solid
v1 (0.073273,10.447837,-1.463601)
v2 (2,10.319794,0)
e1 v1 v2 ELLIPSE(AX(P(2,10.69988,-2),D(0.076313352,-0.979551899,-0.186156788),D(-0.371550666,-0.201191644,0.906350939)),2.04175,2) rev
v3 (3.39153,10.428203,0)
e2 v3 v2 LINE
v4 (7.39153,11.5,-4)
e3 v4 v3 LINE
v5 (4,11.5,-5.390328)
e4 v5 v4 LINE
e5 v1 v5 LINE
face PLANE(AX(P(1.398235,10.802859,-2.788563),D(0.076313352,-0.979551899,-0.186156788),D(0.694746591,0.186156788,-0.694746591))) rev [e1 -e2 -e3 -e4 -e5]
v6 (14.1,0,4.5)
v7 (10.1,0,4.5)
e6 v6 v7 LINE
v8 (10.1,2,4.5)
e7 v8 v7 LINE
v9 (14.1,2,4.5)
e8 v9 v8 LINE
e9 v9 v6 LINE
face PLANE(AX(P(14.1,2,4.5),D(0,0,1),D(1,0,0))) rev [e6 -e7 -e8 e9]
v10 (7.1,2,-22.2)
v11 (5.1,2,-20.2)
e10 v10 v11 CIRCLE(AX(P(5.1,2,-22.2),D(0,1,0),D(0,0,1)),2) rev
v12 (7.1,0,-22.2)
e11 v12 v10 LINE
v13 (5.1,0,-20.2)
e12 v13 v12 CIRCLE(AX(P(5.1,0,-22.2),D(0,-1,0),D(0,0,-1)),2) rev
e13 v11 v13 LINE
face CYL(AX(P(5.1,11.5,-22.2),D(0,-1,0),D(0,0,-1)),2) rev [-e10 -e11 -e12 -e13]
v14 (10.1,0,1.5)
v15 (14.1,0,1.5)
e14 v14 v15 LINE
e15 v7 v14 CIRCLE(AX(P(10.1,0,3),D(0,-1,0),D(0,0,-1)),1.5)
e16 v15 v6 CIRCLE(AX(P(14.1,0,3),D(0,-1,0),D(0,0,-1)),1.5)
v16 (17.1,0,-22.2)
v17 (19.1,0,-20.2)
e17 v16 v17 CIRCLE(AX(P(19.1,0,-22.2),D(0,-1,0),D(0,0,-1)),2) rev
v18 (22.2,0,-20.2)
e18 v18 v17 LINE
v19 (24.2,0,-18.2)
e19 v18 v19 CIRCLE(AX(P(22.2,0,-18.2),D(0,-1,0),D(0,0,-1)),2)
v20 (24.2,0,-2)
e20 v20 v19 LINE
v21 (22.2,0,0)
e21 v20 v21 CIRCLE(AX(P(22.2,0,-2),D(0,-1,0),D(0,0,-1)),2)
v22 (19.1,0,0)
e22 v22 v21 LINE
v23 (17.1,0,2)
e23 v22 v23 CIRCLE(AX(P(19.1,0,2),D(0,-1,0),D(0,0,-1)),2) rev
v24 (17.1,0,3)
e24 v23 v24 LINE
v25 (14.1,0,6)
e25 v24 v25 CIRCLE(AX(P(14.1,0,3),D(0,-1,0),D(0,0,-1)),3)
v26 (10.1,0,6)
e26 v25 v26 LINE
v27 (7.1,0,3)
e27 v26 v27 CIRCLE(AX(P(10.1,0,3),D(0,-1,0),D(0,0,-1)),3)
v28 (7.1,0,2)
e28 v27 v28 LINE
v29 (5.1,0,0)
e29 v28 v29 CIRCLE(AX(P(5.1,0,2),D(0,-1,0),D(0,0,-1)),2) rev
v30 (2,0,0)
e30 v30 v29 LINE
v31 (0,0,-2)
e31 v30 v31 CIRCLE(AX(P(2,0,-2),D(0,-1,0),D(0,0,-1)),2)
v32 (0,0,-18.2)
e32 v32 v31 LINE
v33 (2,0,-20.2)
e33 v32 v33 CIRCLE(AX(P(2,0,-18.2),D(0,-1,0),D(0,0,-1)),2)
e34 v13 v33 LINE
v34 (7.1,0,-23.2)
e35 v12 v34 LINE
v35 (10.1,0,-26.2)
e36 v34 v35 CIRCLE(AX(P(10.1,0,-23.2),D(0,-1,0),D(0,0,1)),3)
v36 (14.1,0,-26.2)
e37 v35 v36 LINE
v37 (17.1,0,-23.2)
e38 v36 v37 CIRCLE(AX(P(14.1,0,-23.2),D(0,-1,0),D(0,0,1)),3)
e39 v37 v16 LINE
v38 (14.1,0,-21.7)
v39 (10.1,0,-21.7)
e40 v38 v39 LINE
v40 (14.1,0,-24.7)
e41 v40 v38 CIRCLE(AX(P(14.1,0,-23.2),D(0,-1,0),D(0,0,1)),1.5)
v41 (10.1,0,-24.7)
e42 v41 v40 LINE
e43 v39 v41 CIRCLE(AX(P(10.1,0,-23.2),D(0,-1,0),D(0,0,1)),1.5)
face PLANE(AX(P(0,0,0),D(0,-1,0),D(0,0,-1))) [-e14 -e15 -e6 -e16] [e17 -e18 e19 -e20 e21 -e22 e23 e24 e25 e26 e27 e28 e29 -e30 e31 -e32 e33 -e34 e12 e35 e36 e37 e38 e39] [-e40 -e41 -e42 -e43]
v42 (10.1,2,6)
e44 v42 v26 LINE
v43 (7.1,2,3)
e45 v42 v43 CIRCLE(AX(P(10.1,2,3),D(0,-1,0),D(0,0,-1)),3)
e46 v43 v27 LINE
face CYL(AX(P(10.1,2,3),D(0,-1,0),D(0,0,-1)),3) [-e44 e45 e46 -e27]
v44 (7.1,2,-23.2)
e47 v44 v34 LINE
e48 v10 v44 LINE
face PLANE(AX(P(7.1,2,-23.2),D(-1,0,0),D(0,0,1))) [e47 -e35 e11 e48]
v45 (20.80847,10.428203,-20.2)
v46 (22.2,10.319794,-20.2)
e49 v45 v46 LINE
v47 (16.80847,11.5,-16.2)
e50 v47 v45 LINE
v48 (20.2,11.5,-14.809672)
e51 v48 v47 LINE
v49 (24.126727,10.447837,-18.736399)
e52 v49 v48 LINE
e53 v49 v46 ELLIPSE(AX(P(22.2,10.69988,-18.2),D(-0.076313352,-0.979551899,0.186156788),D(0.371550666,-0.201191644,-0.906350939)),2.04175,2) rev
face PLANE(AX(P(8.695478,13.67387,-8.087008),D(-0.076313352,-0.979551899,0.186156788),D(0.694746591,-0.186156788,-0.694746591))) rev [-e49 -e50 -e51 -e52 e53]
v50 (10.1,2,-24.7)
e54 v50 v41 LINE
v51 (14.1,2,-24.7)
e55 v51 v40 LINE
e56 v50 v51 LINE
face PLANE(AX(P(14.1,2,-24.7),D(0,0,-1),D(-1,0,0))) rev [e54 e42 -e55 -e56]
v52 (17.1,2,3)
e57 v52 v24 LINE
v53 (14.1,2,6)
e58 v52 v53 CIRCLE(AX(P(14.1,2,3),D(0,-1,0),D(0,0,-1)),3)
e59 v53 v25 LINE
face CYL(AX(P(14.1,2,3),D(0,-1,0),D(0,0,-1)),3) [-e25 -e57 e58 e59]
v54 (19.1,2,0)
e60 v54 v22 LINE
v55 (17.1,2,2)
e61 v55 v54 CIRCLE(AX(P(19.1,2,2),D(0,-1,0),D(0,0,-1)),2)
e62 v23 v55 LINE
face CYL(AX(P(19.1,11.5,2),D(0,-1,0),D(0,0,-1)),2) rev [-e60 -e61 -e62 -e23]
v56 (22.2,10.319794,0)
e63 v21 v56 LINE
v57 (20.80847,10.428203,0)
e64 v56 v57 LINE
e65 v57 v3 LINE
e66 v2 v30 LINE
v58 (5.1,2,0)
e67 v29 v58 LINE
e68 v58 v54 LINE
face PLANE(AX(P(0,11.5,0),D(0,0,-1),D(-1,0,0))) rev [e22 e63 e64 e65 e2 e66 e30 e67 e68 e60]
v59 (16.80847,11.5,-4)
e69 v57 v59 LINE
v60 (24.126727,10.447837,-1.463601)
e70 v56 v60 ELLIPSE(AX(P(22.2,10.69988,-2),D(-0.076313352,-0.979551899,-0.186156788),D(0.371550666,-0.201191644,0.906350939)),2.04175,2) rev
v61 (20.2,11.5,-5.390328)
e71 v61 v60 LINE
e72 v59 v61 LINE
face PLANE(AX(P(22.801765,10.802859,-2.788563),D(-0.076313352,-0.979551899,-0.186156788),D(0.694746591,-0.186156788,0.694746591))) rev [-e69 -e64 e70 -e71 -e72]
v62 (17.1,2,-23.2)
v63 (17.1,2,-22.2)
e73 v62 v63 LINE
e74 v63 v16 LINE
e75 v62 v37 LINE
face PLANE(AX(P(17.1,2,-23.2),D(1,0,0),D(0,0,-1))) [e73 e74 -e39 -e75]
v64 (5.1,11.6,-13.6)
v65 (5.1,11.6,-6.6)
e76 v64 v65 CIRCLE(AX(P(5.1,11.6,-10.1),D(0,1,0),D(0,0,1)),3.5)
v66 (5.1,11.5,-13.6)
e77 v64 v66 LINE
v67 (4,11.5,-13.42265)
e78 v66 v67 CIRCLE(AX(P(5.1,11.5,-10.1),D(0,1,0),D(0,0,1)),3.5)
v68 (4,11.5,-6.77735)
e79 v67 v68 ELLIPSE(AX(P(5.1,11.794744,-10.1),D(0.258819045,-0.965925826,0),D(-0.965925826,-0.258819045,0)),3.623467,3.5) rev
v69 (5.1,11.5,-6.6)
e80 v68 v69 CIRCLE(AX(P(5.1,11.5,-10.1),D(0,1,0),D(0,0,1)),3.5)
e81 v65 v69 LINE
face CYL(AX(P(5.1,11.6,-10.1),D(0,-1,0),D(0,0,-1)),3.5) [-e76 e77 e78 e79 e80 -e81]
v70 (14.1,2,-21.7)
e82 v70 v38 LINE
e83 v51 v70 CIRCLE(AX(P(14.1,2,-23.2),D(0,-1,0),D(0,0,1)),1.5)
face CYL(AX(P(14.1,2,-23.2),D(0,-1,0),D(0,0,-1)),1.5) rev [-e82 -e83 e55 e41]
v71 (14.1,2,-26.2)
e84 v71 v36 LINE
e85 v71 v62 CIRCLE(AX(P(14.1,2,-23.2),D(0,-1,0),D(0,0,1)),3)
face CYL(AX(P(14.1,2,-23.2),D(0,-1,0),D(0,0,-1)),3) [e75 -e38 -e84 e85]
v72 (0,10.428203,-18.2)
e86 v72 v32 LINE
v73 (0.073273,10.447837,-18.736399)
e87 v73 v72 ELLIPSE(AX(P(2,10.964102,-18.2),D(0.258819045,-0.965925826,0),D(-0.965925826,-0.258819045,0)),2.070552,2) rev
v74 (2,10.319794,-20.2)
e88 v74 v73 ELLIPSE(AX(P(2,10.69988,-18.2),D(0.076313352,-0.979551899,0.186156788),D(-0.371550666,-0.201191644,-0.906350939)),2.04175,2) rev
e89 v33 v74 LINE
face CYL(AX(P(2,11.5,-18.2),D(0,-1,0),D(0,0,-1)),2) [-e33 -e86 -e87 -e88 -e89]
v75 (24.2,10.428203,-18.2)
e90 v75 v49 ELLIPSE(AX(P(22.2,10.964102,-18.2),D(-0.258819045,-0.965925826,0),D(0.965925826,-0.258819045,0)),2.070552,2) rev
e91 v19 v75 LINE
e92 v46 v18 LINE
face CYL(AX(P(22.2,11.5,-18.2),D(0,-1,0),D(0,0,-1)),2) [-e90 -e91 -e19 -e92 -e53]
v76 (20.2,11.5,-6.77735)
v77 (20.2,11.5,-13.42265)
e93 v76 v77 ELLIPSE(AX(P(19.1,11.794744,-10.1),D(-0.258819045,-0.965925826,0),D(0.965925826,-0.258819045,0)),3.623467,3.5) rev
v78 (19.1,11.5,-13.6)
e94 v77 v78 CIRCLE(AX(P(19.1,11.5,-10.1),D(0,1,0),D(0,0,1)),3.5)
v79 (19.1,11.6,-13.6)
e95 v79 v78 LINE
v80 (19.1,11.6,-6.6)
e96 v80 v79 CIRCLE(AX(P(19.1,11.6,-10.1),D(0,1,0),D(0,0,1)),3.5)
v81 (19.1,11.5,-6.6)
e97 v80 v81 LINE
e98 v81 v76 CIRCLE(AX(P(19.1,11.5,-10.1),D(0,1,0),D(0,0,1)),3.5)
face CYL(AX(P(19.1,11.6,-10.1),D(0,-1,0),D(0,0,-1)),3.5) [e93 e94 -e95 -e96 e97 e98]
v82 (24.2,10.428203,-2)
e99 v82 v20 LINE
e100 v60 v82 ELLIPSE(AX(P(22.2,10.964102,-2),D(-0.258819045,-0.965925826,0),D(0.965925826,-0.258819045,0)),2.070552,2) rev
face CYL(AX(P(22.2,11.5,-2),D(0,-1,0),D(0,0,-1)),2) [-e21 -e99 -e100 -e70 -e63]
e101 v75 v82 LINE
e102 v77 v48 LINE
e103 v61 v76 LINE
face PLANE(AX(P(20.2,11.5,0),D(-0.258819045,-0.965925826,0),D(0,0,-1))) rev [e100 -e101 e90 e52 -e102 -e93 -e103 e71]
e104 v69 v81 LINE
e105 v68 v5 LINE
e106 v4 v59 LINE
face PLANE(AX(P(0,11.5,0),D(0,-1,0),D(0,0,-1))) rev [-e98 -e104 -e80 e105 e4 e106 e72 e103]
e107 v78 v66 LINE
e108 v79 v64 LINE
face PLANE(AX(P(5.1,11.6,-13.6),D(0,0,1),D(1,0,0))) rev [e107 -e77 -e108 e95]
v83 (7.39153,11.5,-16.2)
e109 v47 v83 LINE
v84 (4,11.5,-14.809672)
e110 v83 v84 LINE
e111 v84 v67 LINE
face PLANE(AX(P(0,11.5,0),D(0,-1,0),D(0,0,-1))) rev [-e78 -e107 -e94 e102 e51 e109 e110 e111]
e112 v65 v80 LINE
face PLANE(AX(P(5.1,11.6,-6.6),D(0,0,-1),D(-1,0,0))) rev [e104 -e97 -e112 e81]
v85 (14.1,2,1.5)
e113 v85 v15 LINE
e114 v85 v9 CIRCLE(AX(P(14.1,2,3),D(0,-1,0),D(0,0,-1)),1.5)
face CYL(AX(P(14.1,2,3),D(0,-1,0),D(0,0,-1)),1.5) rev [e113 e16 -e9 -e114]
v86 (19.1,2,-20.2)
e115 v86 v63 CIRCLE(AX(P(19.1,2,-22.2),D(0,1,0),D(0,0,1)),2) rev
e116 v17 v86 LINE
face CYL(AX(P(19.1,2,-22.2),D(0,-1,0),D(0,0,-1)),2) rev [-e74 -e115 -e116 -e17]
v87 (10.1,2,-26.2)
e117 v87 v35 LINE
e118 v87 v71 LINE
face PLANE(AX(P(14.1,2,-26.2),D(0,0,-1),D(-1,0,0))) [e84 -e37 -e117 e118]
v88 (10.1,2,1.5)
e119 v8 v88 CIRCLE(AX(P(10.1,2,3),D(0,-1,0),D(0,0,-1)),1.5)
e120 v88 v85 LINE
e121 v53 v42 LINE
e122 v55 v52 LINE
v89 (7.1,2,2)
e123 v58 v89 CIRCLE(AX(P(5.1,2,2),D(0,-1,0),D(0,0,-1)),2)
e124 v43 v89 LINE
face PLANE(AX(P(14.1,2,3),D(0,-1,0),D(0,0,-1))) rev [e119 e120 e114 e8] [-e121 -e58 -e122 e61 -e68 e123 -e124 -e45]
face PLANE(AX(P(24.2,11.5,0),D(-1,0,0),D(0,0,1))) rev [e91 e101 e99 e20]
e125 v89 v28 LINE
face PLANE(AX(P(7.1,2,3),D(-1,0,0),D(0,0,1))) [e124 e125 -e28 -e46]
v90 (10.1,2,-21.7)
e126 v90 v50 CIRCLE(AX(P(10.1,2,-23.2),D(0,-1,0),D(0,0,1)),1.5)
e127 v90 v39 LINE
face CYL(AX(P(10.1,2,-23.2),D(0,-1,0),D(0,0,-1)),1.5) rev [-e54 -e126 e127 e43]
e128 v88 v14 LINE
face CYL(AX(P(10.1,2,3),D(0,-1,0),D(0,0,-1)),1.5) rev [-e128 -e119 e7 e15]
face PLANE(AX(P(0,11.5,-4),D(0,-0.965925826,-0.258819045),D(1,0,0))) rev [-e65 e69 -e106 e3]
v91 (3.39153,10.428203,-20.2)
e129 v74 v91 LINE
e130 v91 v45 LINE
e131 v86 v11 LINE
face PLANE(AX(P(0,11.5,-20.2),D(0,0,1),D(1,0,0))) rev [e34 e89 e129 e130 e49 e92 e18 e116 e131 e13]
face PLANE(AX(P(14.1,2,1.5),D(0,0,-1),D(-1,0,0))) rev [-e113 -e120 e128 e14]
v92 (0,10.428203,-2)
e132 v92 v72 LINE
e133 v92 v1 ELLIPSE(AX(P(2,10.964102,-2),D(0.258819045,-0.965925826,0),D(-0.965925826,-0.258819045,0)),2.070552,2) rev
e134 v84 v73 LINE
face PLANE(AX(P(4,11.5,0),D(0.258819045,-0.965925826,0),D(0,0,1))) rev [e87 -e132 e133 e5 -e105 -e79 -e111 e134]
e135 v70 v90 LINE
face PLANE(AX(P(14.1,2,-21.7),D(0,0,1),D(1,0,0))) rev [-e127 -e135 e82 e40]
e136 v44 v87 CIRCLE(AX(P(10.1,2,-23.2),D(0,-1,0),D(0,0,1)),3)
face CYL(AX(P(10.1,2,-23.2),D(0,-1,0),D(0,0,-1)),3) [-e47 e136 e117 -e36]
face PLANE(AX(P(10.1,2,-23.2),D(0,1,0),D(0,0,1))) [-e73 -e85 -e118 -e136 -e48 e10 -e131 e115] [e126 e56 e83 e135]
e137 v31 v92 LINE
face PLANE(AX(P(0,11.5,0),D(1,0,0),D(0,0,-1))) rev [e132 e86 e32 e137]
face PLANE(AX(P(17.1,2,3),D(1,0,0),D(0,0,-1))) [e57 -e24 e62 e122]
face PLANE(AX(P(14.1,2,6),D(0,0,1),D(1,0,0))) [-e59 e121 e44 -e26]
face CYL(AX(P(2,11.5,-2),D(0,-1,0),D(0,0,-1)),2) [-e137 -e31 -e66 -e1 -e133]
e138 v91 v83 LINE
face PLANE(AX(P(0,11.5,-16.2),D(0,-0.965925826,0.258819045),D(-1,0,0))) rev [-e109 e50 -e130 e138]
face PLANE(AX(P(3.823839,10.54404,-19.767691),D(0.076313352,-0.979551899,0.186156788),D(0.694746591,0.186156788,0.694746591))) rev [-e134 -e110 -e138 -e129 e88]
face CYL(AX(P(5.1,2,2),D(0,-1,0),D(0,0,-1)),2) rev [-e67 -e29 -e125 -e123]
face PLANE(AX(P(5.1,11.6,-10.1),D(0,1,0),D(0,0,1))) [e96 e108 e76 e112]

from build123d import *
from OCP.BRepFilletAPI import BRepFilletAPI_MakeChamfer

# Parameters (mm, degrees)
SKETCH_1_W       = 24.2
SKETCH_1_H       = 20.2
EXTRUDE_1_DEPTH  = 11.5
EXTRUDE_2_DEPTH  = 2
FILLET_1_R       = 2
EXTRUDE_3_DEPTH  = 0.1
CHAMFER_1_SIZE   = 4
CHAMFER_1_SIZE_2 = 1.07179677
CHAMFER_3_SIZE   = 1
CHAMFER_3_SIZE2  = 2.43937374
FILLET_2_R       = 2


with BuildPart() as part:
    # 草图1 → 凸台-拉伸1 (new body)
    with BuildSketch(Plane(origin=(0, 0, 0), x_dir=(1, 0, 0), z_dir=(0, 1, 0))):
        with Locations((12.1, 10.1)):
            Rectangle(SKETCH_1_W, SKETCH_1_H)
    extrude(amount=EXTRUDE_1_DEPTH)

    # 草图2 → 凸台-拉伸2 (add)
    # profile 1 of 2: a face of its own
    with BuildSketch(Plane.XZ):
        with BuildLine():
            Line((17.1, 0), (7.1, 0))
            Line((7.1, 0), (7.1, 3))
            ThreePointArc((7.1, 3), (7.978679656, 5.121320344), (10.1, 6))
            Line((10.1, 6), (14.1, 6))
            ThreePointArc((14.1, 6), (16.221320344, 5.121320344), (17.1, 3))
            Line((17.1, 3), (17.1, 0))
        make_face()
        with BuildLine():
            Line((14.1, 1.5), (10.1, 1.5))
            ThreePointArc((10.1, 1.5), (8.6, 3), (10.1, 4.5))
            Line((10.1, 4.5), (14.1, 4.5))
            ThreePointArc((14.1, 4.5), (15.6, 3), (14.1, 1.5))
        make_face(mode=Mode.SUBTRACT)
    # profile 2 of 2: a face of its own
    with BuildSketch(Plane.XZ):
        with BuildLine():
            Line((7.1, -23.2), (7.1, -20.2))
            Line((7.1, -20.2), (17.1, -20.2))
            Line((17.1, -20.2), (17.1, -23.2))
            ThreePointArc((17.1, -23.2), (16.221320344, -25.321320344), (14.1, -26.2))
            Line((14.1, -26.2), (10.1, -26.2))
            ThreePointArc((10.1, -26.2), (7.978679656, -25.321320344), (7.1, -23.2))
        make_face()
        with BuildLine():
            Line((14.1, -21.7), (10.1, -21.7))
            ThreePointArc((10.1, -21.7), (8.6, -23.2), (10.1, -24.7))
            Line((10.1, -24.7), (14.1, -24.7))
            ThreePointArc((14.1, -24.7), (15.6, -23.2), (14.1, -21.7))
        make_face(mode=Mode.SUBTRACT)
    extrude(amount=-EXTRUDE_2_DEPTH)

    # 圆角1
    fillet_1_edges = [part.edges().sort_by_distance(p)[0] for p in [
        (7.1, 1, -20.2),
        (17.1, 1, -20.2),
        (17.1, 1, 0),
        (7.1, 1, 0),
    ]]
    fillet(fillet_1_edges, radius=FILLET_1_R)

    # 草图3 → 凸台-拉伸3 (add)
    with BuildSketch(Plane(origin=(0, 11.5, 0), x_dir=(1, 0, 0), z_dir=(0, 1, 0))):
        with BuildLine():
            Line((5.1, 13.6), (19.1, 13.6))
            ThreePointArc((19.1, 13.6), (22.6, 10.1), (19.1, 6.6))
            Line((19.1, 6.6), (5.1, 6.6))
            ThreePointArc((5.1, 6.6), (1.6, 10.1), (5.1, 13.6))
        make_face()
    extrude(amount=EXTRUDE_3_DEPTH)

    # 倒角1
    # the kernel refuses this chamfer: 4, 1.07179677 mm, written as the material it takes off along each edge
    with BuildSketch(Plane(origin=(24.2, 11.5, 10.386886281), x_dir=(-1, 0, 0), z_dir=(0, 0, -1))) as chamfer_1_piece_1_section:
        Polygon((CHAMFER_1_SIZE, 0), (0, -CHAMFER_1_SIZE_2), (0, 0), align=None)
    chamfer_1_piece_1 = extrude(amount=40.973772562, mode=Mode.PRIVATE)
    chamfer_1_piece_1 = chamfer_1_piece_1 - Plane(origin=(19.1, 11.5, -10.1), x_dir=(0, 0, -1), z_dir=(0, -1, 0)) * Cylinder(3.5, 98, mode=Mode.PRIVATE)
    add(chamfer_1_piece_1, mode=Mode.SUBTRACT)
    with BuildSketch(Plane(origin=(34.586886281, 11.5, -20.2), x_dir=(0, 0, 1), z_dir=(-1, 0, 0))) as chamfer_1_piece_2:
        Polygon((CHAMFER_1_SIZE, 0), (0, -CHAMFER_1_SIZE_2), (0, 0), align=None)
    extrude(amount=44.973772562, mode=Mode.SUBTRACT)
    with BuildSketch(Plane(origin=(0, 11.5, -30.586886281), x_dir=(0, -1, 0), z_dir=(0, 0, 1))) as chamfer_1_piece_3_section:
        Polygon((CHAMFER_1_SIZE_2, 0), (0, CHAMFER_1_SIZE), (0, 0), align=None)
    chamfer_1_piece_3 = extrude(amount=40.973772562, mode=Mode.PRIVATE)
    chamfer_1_piece_3 = chamfer_1_piece_3 - Plane(origin=(5.1, 11.5, -10.1), x_dir=(0, 0, 1), z_dir=(0, -1, 0)) * Cylinder(3.5, 98, mode=Mode.PRIVATE)
    add(chamfer_1_piece_3, mode=Mode.SUBTRACT)
    with BuildSketch(Plane(origin=(-10.386886281, 11.5, 0), x_dir=(0, -1, 0), z_dir=(1, 0, 0))) as chamfer_1_piece_4:
        Polygon((CHAMFER_1_SIZE_2, 0), (0, CHAMFER_1_SIZE), (0, 0), align=None)
    extrude(amount=44.973772562, mode=Mode.SUBTRACT)

    # 倒角3: one chamfer whose edges measure the first distance from different faces: ONE call of the kernel's chamfer builder (chamfer() names one face for all edges)
    chamfer_3_edges_1 = [part.edges().sort_by_distance(p)[0] for p in [
        (22.2, 10.964101615, -2),
        (22.2, 10.964101615, -18.2),
    ]]
    chamfer_3_side_1 = [part.faces().sort_by_distance(p)[0] for p in [
        (22.621463638, 10.851170773, -10.1),
    ]]
    chamfer_3_edges_2 = [part.edges().sort_by_distance(p)[0] for p in [
        (2, 10.964101615, -2),
        (2, 10.964101615, -18.2),
    ]]
    chamfer_3_side_2 = [part.faces().sort_by_distance(p)[0] for p in [
        (1.578536362, 10.851170773, -10.1),
    ]]
    chamfer_3 = BRepFilletAPI_MakeChamfer(part.part.solid().wrapped)
    for e in chamfer_3_edges_1:
        chamfer_3.Add(CHAMFER_3_SIZE, CHAMFER_3_SIZE2, e.wrapped, chamfer_3_side_1[0].wrapped)  # the first distance lies on this face
    for e in chamfer_3_edges_2:
        chamfer_3.Add(CHAMFER_3_SIZE, CHAMFER_3_SIZE2, e.wrapped, chamfer_3_side_2[0].wrapped)  # the first distance lies on this face
    add(Compound.cast(chamfer_3.Shape()), mode=Mode.REPLACE)

    # 圆角2
    fillet_2_edges = [part.edges().sort_by_distance(p)[0] for p in [
        (0, 5.081990675, 0),
        (0, 5.081990675, -20.2),
        (24.2, 5.081990675, -20.2),
        (24.2, 5.081990675, 0),
    ]]
    fillet(fillet_2_edges, radius=FILLET_2_R)


solid = part.part
